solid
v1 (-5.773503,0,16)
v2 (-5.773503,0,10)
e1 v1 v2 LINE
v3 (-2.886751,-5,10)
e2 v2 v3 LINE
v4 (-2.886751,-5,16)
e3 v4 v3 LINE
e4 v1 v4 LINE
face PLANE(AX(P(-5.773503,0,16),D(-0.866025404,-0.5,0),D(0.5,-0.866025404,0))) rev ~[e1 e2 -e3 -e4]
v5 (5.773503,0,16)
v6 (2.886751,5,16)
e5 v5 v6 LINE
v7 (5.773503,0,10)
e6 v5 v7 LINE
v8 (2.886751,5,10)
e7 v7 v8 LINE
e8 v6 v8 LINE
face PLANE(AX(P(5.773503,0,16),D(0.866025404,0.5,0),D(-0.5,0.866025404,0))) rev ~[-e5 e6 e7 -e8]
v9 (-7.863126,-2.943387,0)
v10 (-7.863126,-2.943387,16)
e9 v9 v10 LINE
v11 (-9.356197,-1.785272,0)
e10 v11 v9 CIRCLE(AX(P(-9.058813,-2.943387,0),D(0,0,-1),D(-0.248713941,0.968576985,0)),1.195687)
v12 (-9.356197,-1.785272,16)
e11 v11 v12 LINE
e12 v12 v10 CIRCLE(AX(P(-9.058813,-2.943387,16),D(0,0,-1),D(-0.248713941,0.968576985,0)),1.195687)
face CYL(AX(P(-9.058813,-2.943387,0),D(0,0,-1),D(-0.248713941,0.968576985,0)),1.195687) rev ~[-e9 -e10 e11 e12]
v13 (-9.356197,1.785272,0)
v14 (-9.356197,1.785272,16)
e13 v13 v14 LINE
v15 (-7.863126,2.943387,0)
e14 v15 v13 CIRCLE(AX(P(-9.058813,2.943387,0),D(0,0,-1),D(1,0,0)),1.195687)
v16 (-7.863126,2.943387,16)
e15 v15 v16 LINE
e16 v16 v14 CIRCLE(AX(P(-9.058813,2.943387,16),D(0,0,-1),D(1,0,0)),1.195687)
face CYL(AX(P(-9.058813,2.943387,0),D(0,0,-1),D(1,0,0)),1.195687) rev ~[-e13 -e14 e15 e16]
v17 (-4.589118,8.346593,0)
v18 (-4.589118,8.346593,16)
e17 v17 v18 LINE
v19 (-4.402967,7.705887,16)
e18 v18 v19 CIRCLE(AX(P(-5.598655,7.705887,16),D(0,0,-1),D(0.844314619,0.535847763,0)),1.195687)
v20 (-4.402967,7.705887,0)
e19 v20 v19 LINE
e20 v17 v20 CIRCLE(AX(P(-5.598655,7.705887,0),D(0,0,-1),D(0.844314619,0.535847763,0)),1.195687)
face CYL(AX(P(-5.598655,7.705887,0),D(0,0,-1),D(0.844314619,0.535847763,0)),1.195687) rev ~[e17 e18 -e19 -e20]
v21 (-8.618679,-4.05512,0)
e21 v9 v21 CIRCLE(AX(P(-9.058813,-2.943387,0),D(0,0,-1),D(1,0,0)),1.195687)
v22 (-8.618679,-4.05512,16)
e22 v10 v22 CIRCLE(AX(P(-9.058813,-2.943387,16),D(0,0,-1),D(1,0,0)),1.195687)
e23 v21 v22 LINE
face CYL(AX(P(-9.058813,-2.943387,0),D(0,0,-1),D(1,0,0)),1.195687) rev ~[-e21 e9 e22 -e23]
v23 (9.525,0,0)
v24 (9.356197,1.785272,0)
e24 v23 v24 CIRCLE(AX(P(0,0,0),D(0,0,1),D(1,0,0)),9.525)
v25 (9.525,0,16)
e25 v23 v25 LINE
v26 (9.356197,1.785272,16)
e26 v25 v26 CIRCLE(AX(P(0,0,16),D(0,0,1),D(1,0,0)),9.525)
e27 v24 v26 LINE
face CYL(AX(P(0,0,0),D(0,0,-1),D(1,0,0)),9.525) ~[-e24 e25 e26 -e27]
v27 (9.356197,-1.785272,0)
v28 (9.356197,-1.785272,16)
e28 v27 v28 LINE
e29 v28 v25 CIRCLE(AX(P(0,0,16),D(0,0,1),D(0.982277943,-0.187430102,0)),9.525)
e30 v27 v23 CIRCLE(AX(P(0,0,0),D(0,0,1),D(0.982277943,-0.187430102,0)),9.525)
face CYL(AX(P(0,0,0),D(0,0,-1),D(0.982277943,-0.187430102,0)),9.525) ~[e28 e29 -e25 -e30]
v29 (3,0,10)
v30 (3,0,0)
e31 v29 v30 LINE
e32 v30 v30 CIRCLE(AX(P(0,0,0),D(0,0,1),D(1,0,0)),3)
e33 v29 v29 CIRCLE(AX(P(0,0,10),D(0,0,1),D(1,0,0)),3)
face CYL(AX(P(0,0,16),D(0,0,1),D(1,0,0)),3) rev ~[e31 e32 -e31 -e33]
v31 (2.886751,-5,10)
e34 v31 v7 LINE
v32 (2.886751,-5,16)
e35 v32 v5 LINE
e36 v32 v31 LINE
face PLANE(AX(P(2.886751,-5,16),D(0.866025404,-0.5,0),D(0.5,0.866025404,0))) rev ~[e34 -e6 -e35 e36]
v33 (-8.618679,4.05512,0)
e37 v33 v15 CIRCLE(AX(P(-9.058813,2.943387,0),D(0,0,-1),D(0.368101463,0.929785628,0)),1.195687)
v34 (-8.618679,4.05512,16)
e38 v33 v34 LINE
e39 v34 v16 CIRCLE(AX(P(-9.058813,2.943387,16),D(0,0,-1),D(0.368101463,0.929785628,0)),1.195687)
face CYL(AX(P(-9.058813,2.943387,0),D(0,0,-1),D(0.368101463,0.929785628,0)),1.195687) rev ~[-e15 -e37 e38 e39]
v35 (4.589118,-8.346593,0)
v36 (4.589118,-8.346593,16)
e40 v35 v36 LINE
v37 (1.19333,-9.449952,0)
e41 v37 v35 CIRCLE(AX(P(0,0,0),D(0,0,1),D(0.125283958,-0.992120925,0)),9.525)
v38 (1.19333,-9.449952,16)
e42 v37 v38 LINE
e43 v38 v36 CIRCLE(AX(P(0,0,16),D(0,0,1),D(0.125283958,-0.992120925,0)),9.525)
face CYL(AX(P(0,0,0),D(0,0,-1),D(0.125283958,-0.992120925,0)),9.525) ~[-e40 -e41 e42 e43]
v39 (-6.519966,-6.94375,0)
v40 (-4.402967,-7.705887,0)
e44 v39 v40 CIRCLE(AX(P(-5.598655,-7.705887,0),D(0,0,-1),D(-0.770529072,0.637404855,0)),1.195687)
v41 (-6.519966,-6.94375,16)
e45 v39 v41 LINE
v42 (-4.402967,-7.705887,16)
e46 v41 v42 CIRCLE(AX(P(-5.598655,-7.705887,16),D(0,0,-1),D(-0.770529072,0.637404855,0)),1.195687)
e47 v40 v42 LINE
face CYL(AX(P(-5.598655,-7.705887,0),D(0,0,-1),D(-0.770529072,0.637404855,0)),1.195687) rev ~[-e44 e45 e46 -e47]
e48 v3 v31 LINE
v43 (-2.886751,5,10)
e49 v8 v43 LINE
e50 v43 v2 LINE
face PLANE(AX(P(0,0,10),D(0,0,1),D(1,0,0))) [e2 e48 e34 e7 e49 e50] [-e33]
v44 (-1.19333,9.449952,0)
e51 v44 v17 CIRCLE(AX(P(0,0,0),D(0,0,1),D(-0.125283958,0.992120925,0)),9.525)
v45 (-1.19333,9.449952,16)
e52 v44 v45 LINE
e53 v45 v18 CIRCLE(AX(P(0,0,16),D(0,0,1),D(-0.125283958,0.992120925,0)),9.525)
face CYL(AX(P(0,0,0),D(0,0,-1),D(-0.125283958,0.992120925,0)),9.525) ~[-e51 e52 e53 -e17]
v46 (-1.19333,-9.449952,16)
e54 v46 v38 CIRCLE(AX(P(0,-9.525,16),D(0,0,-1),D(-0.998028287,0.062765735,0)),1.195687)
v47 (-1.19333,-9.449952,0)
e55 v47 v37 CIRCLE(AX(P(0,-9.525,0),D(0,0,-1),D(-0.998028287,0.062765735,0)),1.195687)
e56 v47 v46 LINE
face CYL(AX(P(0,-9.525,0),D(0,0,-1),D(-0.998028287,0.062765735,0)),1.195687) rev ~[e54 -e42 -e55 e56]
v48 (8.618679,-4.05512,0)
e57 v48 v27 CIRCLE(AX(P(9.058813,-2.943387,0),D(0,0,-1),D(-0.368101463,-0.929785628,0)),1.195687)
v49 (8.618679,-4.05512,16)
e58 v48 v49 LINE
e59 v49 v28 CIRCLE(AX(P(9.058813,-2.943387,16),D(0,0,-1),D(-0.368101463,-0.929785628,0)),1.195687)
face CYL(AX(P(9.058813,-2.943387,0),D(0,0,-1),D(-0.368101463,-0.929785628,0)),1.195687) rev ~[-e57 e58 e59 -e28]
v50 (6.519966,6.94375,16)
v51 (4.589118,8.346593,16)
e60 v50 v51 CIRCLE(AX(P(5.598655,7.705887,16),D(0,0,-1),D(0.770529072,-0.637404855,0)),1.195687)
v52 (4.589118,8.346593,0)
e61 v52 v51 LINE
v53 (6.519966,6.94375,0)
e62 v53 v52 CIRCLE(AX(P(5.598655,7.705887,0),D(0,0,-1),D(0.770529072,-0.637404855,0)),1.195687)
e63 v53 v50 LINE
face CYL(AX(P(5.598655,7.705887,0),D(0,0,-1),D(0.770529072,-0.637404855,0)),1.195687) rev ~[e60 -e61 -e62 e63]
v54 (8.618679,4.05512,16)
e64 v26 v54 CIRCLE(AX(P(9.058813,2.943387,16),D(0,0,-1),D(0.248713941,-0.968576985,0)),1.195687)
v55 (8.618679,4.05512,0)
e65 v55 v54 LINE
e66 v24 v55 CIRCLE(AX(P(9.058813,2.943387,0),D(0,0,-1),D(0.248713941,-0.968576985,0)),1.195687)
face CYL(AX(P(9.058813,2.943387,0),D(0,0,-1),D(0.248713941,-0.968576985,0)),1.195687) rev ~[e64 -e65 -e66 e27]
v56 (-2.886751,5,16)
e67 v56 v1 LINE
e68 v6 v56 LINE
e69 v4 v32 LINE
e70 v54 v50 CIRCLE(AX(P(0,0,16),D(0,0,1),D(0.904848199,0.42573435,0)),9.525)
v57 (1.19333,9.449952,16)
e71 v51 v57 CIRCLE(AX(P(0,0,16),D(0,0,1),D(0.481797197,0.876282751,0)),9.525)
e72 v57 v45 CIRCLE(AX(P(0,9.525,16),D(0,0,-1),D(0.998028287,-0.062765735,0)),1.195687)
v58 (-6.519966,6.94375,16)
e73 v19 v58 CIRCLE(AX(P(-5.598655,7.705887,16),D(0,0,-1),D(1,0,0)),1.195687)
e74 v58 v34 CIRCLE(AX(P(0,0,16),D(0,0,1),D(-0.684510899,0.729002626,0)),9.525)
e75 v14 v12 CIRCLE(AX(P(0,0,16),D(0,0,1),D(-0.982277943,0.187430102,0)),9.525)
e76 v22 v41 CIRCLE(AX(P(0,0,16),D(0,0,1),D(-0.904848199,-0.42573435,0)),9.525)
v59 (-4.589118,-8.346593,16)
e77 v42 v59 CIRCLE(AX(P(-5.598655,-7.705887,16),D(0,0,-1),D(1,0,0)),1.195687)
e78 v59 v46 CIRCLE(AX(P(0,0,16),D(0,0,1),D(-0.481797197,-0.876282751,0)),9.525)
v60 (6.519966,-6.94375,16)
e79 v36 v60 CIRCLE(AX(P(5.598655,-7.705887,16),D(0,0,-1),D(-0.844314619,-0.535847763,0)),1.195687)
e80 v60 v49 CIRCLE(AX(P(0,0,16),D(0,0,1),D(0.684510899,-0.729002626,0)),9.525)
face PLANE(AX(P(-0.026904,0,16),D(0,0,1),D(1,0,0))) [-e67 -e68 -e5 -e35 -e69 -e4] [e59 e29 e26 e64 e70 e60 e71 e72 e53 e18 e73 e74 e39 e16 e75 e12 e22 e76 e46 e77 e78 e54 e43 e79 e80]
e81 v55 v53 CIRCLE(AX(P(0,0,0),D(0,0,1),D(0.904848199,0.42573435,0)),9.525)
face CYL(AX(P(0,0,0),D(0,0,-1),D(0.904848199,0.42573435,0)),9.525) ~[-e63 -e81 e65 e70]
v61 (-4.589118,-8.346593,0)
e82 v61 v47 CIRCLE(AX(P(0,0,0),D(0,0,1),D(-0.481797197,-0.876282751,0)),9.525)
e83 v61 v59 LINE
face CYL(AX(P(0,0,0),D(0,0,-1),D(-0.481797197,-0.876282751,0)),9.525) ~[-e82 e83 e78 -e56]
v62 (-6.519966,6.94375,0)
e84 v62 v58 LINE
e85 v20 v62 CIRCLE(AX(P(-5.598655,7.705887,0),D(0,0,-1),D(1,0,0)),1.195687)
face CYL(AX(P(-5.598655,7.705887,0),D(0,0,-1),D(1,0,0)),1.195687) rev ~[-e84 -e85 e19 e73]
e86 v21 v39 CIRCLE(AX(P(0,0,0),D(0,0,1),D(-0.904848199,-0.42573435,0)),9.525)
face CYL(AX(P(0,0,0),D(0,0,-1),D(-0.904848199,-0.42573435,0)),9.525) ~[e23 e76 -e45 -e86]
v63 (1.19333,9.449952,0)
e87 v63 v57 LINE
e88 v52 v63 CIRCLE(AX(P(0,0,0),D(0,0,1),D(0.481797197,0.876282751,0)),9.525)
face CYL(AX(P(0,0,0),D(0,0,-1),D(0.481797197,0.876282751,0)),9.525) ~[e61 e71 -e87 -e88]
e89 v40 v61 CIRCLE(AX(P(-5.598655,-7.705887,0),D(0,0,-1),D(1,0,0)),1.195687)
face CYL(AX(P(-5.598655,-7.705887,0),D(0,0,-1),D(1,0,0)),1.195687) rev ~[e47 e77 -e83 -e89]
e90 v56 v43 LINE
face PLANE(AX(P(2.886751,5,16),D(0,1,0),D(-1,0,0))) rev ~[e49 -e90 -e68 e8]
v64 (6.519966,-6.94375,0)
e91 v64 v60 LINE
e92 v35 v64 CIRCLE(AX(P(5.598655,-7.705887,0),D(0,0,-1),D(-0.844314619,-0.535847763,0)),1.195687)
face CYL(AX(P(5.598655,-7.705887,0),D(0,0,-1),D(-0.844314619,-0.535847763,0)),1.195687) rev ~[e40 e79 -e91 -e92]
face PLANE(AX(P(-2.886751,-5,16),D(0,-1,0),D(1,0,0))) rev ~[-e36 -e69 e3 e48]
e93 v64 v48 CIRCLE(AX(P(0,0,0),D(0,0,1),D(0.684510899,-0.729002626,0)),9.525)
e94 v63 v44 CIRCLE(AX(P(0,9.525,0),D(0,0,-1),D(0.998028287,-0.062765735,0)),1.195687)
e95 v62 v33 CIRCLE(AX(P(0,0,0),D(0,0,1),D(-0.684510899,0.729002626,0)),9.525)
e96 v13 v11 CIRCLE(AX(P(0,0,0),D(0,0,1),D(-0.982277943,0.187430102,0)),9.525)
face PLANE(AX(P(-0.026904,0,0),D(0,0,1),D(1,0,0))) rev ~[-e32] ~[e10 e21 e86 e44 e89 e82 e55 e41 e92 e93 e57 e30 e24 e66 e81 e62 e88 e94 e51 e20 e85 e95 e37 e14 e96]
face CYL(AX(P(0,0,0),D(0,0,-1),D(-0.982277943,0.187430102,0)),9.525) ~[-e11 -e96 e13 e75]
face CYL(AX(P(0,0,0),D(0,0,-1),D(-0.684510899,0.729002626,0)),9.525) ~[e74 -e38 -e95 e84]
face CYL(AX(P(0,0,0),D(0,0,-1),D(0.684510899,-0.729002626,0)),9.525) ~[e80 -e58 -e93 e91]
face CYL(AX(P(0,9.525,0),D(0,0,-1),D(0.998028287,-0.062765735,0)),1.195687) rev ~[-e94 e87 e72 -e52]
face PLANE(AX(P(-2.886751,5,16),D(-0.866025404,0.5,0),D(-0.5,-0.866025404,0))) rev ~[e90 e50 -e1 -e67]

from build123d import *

# Parameters (mm, degrees)
F1_DEPTH = 16
F2_R     = 3
F3_DEPTH = 16.001
F4_R     = 3
F5_DEPTH = 6


with BuildPart() as f1:
    # F0 (on Top) → F1 (new body)
    with BuildSketch(Plane.XY):
        with BuildLine():
            ThreePointArc((9.3561974046, -1.7852717232), (9.4827054494, -0.8966171761), (9.525, 0))
            ThreePointArc((9.525, 0), (9.4827054494, 0.8966171761), (9.3561974046, 1.7852717232))
            ThreePointArc((9.3561974046, 1.7852717232), (7.9216471704, 2.5738991923), (8.6186790933, 4.0551196883))
            ThreePointArc((8.6186790933, 4.0551196883), (7.7058868714, 5.5986545281), (6.5199663128, 6.9437500156))
            ThreePointArc((6.5199663128, 6.9437500156), (4.8958471982, 6.738555569), (4.5891183065, 8.3465932074))
            ThreePointArc((4.5891183065, 8.3465932074), (2.9433868714, 9.0588133177), (1.193329695, 9.4499518115))
            ThreePointArc((1.193329695, 9.4499518115), (0, 8.3293127534), (-1.193329695, 9.4499518115))
            ThreePointArc((-1.193329695, 9.4499518115), (-2.9433868714, 9.0588133177), (-4.5891183065, 8.3465932074))
            ThreePointArc((-4.5891183065, 8.3465932074), (-4.4504477573, 8.039487236), (-4.4029672815, 7.7058868714))
            ThreePointArc((-4.4029672815, 7.7058868714), (-5.1936438859, 6.5808827064), (-6.5199663128, 6.9437500156))
            ThreePointArc((-6.5199663128, 6.9437500156), (-7.7058868714, 5.5986545281), (-8.6186790933, 4.0551196883))
            ThreePointArc((-8.6186790933, 4.0551196883), (-8.0698919683, 3.6154750772), (-7.8631260711, 2.9433868714))
            ThreePointArc((-7.8631260711, 2.9433868714), (-8.3259799016, 1.9985995007), (-9.3561974046, 1.7852717232))
            ThreePointArc((-9.3561974046, 1.7852717232), (-9.525, 0), (-9.3561974046, -1.7852717232))
            ThreePointArc((-9.3561974046, -1.7852717232), (-8.3259799016, -1.9985995007), (-7.8631260711, -2.9433868714))
            ThreePointArc((-7.8631260711, -2.9433868714), (-8.0698919683, -3.6154750772), (-8.6186790933, -4.0551196883))
            ThreePointArc((-8.6186790933, -4.0551196883), (-7.7058868714, -5.5986545281), (-6.5199663128, -6.9437500156))
            ThreePointArc((-6.5199663128, -6.9437500156), (-5.1936438859, -6.5808827064), (-4.4029672815, -7.7058868714))
            ThreePointArc((-4.4029672815, -7.7058868714), (-4.4504477573, -8.039487236), (-4.5891183065, -8.3465932074))
            ThreePointArc((-4.5891183065, -8.3465932074), (-2.9433868714, -9.0588133177), (-1.193329695, -9.4499518115))
            ThreePointArc((-1.193329695, -9.4499518115), (0, -8.3293127534), (1.193329695, -9.4499518115))
            ThreePointArc((1.193329695, -9.4499518115), (2.9433868714, -9.0588133177), (4.5891183065, -8.3465932074))
            ThreePointArc((4.5891183065, -8.3465932074), (4.8958471982, -6.738555569), (6.5199663128, -6.9437500156))
            ThreePointArc((6.5199663128, -6.9437500156), (7.7058868714, -5.5986545281), (8.6186790933, -4.0551196883))
            ThreePointArc((8.6186790933, -4.0551196883), (7.9216471704, -2.5738991923), (9.3561974046, -1.7852717232))
        make_face()
    extrude(amount=F1_DEPTH)

    # F2 (on face) → F3 (cut, through all)
    with BuildSketch(Plane.XY.offset(16)):
        Circle(F2_R)
    extrude(amount=-F3_DEPTH, mode=Mode.SUBTRACT)

    # F4 (on face) → F5 (cut)
    with BuildSketch(Plane.XY.offset(16)):
        Polygon((2.8867513459, -5), (5.7735026919, 0), (2.8867513459, 5), (-2.8867513459, 5), (-5.7735026919, 0), (-2.8867513459, -5), align=None)
        Circle(F4_R, mode=Mode.SUBTRACT)
    extrude(amount=-F5_DEPTH, mode=Mode.SUBTRACT)


solid = f1.part
